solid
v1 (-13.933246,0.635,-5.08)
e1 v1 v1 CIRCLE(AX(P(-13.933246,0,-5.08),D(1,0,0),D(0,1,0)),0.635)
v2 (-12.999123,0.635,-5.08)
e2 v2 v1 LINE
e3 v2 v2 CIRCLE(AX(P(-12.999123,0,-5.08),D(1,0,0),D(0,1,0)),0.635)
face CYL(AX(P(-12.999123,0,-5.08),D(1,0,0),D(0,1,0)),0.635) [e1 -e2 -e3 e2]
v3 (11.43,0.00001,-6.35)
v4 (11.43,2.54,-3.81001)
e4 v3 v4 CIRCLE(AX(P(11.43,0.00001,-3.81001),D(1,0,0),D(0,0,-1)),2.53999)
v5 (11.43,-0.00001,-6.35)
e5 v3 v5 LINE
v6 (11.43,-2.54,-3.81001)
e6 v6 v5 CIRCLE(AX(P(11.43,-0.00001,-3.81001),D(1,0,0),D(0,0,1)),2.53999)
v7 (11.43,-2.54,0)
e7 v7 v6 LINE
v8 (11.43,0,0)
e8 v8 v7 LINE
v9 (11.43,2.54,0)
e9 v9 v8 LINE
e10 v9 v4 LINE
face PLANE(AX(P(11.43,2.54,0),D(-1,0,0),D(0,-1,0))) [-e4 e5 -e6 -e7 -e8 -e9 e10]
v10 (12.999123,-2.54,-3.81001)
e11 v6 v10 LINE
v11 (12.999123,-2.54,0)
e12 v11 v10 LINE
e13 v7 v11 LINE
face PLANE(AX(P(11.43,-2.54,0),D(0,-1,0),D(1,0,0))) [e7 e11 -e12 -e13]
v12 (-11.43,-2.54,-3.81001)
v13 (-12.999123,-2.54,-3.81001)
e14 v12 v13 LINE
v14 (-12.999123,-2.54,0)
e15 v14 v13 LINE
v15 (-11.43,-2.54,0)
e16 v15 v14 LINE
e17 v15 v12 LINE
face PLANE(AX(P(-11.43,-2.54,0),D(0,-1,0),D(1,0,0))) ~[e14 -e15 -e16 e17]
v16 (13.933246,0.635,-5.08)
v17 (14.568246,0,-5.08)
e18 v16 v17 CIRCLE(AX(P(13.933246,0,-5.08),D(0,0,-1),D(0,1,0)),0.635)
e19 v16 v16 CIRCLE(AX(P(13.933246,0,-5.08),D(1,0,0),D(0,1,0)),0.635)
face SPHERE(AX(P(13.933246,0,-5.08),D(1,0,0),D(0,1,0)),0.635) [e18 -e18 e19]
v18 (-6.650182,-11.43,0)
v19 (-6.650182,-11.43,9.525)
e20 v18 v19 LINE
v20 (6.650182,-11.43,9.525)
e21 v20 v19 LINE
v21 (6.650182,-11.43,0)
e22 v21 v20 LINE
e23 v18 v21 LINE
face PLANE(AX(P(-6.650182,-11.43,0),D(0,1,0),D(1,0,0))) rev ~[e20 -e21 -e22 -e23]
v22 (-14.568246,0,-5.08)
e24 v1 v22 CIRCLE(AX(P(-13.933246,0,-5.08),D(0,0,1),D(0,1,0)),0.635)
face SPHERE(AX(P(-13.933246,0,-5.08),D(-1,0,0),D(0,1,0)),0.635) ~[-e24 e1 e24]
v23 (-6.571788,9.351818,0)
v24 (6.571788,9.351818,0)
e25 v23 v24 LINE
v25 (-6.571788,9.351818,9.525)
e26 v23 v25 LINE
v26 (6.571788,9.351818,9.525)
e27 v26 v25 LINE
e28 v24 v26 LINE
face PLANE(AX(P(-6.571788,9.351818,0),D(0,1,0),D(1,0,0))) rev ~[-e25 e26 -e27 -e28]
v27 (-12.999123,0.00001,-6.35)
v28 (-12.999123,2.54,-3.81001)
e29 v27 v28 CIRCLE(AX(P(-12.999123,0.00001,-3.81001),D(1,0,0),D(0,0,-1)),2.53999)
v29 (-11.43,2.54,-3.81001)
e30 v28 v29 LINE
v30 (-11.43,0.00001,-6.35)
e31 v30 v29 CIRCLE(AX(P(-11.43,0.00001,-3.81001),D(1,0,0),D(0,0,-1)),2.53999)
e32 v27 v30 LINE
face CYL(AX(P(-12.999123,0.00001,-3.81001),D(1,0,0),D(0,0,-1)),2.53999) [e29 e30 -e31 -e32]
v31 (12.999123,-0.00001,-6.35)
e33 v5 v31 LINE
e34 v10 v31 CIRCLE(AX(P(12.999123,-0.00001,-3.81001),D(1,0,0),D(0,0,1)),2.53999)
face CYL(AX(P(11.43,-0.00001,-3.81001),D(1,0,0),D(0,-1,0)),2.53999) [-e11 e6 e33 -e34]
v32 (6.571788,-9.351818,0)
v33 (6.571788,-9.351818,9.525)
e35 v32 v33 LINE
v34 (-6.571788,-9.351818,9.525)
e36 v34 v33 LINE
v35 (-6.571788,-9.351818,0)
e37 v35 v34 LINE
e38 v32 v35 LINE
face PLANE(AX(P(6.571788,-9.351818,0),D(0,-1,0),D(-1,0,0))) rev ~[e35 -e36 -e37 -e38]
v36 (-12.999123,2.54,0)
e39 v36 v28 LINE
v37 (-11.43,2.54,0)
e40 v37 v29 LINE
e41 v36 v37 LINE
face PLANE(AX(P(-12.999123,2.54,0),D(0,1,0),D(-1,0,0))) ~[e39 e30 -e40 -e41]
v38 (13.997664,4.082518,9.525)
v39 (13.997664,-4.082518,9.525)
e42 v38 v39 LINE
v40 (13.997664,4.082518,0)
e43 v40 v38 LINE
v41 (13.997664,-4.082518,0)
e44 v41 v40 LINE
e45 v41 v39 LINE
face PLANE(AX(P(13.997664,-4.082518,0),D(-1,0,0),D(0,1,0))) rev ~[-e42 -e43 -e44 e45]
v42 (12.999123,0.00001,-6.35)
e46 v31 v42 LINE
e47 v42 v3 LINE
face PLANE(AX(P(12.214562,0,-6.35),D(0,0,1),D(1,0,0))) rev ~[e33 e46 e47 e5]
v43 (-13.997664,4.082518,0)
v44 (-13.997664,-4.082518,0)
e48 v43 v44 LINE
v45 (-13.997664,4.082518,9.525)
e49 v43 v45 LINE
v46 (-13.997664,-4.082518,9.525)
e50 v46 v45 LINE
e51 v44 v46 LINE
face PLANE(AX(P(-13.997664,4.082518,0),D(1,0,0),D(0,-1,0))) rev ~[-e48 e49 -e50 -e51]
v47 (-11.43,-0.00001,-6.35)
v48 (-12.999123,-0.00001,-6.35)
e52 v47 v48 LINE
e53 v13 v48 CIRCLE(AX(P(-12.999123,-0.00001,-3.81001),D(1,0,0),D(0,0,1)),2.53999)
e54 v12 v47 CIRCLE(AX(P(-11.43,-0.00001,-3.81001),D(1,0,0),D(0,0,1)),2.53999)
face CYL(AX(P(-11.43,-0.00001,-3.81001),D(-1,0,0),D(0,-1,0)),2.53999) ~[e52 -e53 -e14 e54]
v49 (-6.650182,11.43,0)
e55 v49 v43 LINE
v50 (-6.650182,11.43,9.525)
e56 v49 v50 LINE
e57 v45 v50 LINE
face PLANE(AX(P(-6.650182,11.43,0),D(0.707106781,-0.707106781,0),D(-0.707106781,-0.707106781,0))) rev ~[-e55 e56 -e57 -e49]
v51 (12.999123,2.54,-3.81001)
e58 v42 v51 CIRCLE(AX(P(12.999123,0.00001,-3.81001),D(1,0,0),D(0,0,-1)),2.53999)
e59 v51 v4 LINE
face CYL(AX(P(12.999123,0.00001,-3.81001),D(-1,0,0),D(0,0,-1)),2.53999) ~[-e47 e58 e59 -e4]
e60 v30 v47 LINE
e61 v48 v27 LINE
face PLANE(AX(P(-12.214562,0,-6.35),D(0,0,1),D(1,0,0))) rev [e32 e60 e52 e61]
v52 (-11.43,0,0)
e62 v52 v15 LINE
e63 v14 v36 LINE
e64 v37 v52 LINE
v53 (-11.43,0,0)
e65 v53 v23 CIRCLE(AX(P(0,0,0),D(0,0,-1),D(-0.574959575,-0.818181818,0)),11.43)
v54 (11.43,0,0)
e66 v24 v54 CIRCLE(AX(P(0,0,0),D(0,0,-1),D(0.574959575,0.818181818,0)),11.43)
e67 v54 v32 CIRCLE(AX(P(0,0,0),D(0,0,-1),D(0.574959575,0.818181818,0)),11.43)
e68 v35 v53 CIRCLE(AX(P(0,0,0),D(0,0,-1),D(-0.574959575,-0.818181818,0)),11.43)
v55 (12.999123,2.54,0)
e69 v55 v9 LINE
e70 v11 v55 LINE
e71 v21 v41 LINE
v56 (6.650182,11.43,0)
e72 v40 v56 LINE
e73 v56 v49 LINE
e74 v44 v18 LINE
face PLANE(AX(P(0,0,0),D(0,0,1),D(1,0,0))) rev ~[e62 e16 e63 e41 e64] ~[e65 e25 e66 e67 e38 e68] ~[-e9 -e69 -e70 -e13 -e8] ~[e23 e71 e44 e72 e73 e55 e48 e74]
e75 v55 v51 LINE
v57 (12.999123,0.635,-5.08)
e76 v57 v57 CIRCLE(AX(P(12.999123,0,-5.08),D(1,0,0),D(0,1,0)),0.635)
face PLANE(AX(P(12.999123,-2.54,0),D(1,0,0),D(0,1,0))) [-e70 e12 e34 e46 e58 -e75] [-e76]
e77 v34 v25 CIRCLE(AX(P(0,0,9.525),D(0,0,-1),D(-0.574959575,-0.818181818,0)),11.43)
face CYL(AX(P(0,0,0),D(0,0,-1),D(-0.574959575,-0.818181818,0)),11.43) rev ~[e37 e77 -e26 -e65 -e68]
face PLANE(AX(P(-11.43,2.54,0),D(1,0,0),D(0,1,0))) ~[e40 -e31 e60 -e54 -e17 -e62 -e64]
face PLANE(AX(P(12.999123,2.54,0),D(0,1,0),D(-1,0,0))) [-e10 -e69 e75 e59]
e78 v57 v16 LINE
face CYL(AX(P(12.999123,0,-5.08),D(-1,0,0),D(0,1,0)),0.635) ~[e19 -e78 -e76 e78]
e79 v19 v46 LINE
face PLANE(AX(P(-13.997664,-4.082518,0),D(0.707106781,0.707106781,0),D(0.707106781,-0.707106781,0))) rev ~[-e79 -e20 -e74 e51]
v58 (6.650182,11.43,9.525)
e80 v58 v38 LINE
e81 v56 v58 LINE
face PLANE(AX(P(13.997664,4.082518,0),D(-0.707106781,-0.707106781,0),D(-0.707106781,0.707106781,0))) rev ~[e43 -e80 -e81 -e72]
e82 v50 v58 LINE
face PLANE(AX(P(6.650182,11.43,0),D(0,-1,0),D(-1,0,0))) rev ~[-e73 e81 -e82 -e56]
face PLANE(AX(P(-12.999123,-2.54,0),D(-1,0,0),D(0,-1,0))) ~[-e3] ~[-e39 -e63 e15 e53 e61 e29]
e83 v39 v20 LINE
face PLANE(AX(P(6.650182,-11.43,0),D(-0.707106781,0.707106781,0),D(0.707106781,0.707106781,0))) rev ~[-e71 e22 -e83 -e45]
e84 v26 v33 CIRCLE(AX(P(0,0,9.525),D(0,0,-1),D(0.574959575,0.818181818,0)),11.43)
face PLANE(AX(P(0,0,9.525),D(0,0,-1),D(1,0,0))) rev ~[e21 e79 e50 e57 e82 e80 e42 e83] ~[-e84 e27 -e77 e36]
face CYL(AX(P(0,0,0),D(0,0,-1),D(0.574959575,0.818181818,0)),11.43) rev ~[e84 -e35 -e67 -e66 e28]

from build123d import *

# Parameters (mm, degrees)
F1_DEPTH  = 19.05
F3_DEPTH  = 6.35
F4_R      = 0.635
F5_DEPTH  = 1.5691231
F6_R      = 2.53999
F7_R      = 0.635
F9_DEPTH  = 6.35
F11_D     = 2.54
F16_D     = 127
F16_DEPTH = 15.876


# Not quite as in the source:
# - a fillet or chamfer is up to 0.001 mm smaller than in the source, because OpenCascade refuses the exact size
# - a length typed as a fraction of an inch, garbled in the dataset ("3 / 203.2 mm" for 3/8 in), is restored
# - the program builds the solid bodies; features that only make, move or delete a surface that nothing else refers to are left out


with BuildPart() as f1:
    # F0 (on Top) → F1 (new body)
    with BuildSketch(Plane.XY):
        Polygon((6.6501818182, 11.43), (0, 11.43), (-6.6501818182, 11.43), (-13.9976640991, 4.0825177191), (-13.9976640991, 0), (-13.9976640991, -4.0825177191), (-6.6501818182, -11.43), (0, -11.43), (6.6501818182, -11.43), (13.9976640991, -4.0825177191), (13.9976640991, 0), (13.9976640991, 4.0825177191), align=None)
        with BuildLine():
            ThreePointArc((6.5717879374, 9.3518181818), (10.1429886159, 5.26922024), (11.43, 0))
            ThreePointArc((11.43, 0), (10.1429886159, -5.26922024), (6.5717879374, -9.3518181818))
            Line((6.5717879374, -9.3518181818), (0, -9.3518181818))
            Line((0, -9.3518181818), (-6.5717879374, -9.3518181818))
            ThreePointArc((-6.5717879374, -9.3518181818), (-10.1429886159, -5.26922024), (-11.43, 0))
            ThreePointArc((-11.43, 0), (-10.1429886159, 5.26922024), (-6.5717879374, 9.3518181818))
            Line((-6.5717879374, 9.3518181818), (0, 9.3518181818))
            Line((0, 9.3518181818), (6.5717879374, 9.3518181818))
        make_face(mode=Mode.SUBTRACT)
    extrude(amount=F1_DEPTH)

    # F2 (on Top) → F3 (join)
    with BuildSketch(Plane.XY):
        Polygon((12.9991231, -2.54), (12.9991231, 0), (12.9991231, 2.54), (11.43, 2.54), (11.43, 0), (11.43, -2.54), align=None)
    extrude(amount=-F3_DEPTH)

    # F4 (on face) → F5 (join)
    with BuildSketch(Plane.YZ.offset(12.9991231)):
        with Locations((0, -5.08)):
            Circle(F4_R)
    extrude(amount=F5_DEPTH)

    # F6 (radius 2.54 in the source; OpenCascade refuses exactly that, so slightly less here)
    f6_edges = [f1.edges().sort_by_distance(p)[0] for p in [
        (12.214562, -2.54, -6.35),
        (12.214562, 2.54, -6.35),
    ]]
    fillet(f6_edges, radius=F6_R)

    # F7
    f7_edges = [f1.edges().sort_by_distance(p)[0] for p in [
        (14.568246, -0.635, -5.08),
    ]]
    fillet(f7_edges, radius=F7_R)

    # F8 (on face) → F9 (join)
    with BuildSketch(Plane.XY.offset(19.05)):
        Polygon((13.9976640991, 2.54), (12.4285360385, 2.54), (12.4285360385, 0), (12.4285360385, -2.54), (13.9976640991, -2.54), (13.9976640991, 0), align=None)
    extrude(amount=F9_DEPTH)

    # F11 (through all)
    with Locations(Plane.YZ.offset(13.9976640991)):
        with Locations((0, 22.86)):
            Hole(F11_D / 2)

    # F12: F1 across plane


with BuildPart() as f1_1:
    add(f1.part)
    add(f1.part.mirror(Plane.YZ))

    # F16 (through all, one way)
    with BuildSketch(Plane(origin=(0, 0, 9.525), x_dir=(1, 0, 0), z_dir=(0, 0, -1))):
        with Locations((0, 0)):
            Circle(F16_D / 2)
    extrude(amount=-F16_DEPTH, mode=Mode.SUBTRACT)


solid = f1_1.part
